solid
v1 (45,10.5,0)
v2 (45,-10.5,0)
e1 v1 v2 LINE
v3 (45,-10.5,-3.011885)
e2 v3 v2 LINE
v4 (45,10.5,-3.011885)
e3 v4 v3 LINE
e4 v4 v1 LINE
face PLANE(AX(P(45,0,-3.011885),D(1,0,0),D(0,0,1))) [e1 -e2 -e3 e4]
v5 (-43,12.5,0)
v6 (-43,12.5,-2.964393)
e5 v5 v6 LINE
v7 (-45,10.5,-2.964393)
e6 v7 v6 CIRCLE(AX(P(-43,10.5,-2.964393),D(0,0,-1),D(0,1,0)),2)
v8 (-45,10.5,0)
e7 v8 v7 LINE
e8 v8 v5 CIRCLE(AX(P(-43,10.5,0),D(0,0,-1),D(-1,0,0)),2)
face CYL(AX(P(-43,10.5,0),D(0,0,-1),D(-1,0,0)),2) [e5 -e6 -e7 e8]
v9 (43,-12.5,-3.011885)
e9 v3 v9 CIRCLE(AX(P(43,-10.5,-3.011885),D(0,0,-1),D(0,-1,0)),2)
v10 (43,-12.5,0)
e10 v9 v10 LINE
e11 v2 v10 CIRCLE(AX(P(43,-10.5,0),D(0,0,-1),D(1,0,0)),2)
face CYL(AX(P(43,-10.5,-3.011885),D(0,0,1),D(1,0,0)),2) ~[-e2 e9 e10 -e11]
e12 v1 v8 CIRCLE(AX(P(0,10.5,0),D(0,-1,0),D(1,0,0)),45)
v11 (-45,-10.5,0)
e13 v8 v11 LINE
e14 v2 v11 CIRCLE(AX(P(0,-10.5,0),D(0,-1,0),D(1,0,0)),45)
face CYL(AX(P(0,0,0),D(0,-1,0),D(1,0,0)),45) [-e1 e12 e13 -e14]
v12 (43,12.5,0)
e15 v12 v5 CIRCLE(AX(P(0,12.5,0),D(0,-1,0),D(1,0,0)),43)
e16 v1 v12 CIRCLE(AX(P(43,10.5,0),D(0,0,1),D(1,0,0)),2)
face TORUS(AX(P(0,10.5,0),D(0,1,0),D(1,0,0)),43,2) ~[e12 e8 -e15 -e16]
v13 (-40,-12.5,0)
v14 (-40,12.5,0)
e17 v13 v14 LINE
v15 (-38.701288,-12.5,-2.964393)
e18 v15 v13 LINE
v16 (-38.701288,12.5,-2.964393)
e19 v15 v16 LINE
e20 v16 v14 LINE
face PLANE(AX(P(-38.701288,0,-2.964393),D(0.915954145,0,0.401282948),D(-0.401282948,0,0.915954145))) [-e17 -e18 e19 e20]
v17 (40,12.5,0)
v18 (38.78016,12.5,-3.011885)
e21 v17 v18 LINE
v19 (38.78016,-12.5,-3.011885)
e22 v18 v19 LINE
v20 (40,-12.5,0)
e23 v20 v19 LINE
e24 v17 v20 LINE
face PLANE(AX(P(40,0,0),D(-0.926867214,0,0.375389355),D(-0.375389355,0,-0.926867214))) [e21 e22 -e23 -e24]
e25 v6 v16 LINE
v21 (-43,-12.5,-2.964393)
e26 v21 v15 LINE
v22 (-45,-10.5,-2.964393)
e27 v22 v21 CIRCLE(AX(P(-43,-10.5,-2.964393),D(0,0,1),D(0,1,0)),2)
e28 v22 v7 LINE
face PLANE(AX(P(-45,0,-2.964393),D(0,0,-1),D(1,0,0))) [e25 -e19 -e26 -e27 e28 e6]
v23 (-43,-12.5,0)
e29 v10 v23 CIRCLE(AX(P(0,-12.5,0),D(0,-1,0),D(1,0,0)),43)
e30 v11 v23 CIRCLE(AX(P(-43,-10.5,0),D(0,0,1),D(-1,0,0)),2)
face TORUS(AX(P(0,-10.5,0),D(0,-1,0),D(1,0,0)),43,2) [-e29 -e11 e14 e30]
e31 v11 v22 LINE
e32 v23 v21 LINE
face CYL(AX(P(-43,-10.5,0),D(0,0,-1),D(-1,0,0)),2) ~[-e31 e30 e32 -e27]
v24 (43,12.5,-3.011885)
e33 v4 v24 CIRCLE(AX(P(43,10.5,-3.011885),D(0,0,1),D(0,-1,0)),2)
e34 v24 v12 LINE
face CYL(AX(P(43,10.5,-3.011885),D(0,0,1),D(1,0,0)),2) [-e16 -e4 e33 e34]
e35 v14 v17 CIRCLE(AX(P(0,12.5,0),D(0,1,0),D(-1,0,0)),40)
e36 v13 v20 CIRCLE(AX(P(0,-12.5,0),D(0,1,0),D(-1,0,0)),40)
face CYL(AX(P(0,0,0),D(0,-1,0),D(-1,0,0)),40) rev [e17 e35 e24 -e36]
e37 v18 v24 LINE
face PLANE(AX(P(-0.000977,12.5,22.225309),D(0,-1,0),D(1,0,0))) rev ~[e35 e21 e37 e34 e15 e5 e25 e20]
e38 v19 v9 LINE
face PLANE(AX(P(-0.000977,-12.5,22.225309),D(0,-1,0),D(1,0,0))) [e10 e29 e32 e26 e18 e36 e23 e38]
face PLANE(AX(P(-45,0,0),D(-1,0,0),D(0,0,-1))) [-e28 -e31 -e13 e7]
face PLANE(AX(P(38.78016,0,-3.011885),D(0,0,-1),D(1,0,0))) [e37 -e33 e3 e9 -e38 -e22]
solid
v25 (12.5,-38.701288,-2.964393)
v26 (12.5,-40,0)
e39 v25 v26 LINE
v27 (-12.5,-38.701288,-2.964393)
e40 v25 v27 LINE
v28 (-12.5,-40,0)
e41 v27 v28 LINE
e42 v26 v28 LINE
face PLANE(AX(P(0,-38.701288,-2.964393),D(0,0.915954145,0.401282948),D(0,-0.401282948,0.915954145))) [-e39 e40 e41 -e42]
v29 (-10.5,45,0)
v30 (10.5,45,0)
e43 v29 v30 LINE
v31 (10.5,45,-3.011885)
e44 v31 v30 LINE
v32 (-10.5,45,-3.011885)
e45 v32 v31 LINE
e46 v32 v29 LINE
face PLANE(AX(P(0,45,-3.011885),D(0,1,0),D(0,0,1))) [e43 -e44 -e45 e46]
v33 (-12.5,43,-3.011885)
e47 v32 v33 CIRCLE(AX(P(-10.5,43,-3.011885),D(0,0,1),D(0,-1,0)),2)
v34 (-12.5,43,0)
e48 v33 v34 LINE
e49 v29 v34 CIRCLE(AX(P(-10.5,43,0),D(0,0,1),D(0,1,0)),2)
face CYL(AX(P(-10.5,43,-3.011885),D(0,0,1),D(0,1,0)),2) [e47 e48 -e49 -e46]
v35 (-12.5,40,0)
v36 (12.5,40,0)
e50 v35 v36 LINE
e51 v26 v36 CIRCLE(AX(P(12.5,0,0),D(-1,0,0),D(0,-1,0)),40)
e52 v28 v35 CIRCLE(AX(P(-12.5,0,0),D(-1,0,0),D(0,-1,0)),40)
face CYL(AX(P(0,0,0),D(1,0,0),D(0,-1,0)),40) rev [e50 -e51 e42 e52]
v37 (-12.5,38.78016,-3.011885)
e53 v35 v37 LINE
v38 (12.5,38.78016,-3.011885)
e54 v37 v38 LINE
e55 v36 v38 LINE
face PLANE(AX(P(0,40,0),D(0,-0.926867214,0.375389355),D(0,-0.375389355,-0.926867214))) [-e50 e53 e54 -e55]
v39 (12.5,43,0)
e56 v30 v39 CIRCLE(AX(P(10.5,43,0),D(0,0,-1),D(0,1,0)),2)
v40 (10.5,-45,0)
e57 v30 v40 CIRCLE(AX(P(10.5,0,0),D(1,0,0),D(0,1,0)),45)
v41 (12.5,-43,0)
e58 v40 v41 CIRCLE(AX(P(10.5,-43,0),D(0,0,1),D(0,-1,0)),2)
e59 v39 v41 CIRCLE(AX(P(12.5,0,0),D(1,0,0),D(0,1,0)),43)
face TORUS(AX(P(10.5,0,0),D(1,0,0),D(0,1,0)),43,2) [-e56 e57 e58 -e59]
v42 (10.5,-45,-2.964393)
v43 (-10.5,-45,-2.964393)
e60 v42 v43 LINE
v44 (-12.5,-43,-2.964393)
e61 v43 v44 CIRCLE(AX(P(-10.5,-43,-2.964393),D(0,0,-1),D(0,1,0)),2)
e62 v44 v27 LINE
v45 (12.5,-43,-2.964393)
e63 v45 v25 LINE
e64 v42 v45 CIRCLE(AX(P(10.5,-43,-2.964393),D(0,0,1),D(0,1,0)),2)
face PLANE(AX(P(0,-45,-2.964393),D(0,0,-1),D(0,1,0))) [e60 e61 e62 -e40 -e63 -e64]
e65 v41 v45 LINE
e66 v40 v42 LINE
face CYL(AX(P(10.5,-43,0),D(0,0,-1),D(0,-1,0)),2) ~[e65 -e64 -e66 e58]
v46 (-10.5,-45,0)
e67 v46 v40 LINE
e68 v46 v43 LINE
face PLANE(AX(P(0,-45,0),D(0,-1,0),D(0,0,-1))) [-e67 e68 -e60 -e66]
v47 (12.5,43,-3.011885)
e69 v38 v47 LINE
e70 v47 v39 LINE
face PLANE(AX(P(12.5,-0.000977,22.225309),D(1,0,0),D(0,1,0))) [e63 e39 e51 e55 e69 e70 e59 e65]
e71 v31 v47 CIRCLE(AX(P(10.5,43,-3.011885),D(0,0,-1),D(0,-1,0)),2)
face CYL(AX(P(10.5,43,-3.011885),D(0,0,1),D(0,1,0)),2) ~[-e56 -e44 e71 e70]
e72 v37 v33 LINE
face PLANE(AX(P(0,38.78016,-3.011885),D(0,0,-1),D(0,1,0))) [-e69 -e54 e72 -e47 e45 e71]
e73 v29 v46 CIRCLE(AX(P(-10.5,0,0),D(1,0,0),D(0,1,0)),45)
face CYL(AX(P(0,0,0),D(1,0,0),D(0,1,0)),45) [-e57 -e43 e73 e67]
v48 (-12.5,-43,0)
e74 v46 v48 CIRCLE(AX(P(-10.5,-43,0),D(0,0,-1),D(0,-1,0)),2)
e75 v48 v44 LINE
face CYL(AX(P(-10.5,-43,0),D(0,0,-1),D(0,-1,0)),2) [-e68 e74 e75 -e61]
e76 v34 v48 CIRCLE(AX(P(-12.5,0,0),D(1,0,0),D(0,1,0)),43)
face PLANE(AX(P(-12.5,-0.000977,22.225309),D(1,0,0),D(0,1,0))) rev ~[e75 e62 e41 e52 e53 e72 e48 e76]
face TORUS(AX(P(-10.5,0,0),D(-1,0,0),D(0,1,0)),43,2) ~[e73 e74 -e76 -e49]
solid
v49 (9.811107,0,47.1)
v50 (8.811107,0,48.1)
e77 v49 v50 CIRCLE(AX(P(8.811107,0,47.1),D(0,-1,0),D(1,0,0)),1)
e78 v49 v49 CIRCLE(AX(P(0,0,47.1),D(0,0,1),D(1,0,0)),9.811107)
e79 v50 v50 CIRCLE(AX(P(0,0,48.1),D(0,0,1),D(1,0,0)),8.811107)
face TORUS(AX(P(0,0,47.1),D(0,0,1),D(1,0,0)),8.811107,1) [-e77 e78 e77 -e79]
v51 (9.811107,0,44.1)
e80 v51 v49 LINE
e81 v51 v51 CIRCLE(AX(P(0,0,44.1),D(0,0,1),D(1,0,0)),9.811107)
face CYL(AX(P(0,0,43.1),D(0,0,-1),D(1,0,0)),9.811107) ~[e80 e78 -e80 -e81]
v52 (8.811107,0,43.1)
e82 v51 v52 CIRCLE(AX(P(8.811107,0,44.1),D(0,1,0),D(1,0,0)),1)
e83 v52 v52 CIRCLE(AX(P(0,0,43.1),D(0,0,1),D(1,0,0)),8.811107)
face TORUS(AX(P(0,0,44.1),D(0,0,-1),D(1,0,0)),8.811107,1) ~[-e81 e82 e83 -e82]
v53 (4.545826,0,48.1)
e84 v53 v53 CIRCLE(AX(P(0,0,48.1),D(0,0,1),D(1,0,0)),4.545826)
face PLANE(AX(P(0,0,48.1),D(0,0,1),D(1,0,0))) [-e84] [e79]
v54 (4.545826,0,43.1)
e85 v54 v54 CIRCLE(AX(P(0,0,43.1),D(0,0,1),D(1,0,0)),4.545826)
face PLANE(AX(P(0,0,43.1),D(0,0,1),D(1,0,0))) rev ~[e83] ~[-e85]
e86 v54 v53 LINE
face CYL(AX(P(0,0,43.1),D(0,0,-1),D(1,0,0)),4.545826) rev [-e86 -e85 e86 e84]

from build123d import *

# Parameters (mm, degrees)
F1_DEPTH = 12.5
F4_ANGLE = 90
F5_R     = 2
F5_2_R   = 2
F6_R     = 9.811106596
F6_R_2   = 4.5458259895
F7_DEPTH = 5
F8_R     = 1


with BuildPart() as f1:
    # F0 (on Front) → F1 (new body, symmetric)
    with BuildSketch(Plane.XZ):
        with BuildLine():
            ThreePointArc((-40, 0), (0, 40), (40, 0))
            Line((40, 0), (38.7801602483, -3.0118847469))
            Line((38.7801602483, -3.0118847469), (45, -3.0118847469))
            Line((45, -3.0118847469), (45, 0))
            ThreePointArc((45, 0), (0, 45), (-45, 0))
            Line((-45, 0), (-45, -2.9643927701))
            Line((-45, -2.9643927701), (-38.7012884021, -2.9643927701))
            Line((-38.7012884021, -2.9643927701), (-40, 0))
        make_face()
    extrude(amount=F1_DEPTH, both=True)


with BuildPart() as f4_1:
    # F4: copy of F1
    add(f1.part.rotate(Axis((0, 0, 43.1), (0, 0, 1)), F4_ANGLE))

    # F5#2
    f5_2_edges = [f4_1.edges().sort_by_distance(p)[0] for p in [
        (0, 45, 0),
        (-12.5, 0, 45),
        (0, -45, 0),
        (12.5, 0, 45),
        (-12.5, -45, -1.482196),
        (12.5, -45, -1.482196),
        (-12.5, 45, -1.505942),
        (12.5, 45, -1.505942),
    ]]
    fillet(f5_2_edges, radius=F5_2_R)


with BuildPart() as f1_1:
    add(f1.part)

    # F5
    f5_edges = [f1_1.edges().sort_by_distance(p)[0] for p in [
        (0, -12.5, 45),
        (0, 12.5, 45),
        (-45, 12.5, -1.482196),
        (-45, -12.5, -1.482196),
        (45, 12.5, -1.505942),
        (45, -12.5, -1.505942),
    ]]
    fillet(f5_edges, radius=F5_R)


with BuildPart() as f7:
    # F6 (on offset) → F7 (new body)
    with BuildSketch(Plane.XY.offset(43.1)):
        Circle(F6_R)
        Circle(F6_R_2, mode=Mode.SUBTRACT)
    extrude(amount=F7_DEPTH)

    # F8
    f8_edges = [f7.edges().sort_by_distance(p)[0] for p in [
        (9.811107, 0, 45.6),
        (-9.811107, 0, 43.1),
        (-9.811107, 0, 48.1),
    ]]
    fillet(f8_edges, radius=F8_R)


solid = Compound([f4_1.part, f1_1.part, f7.part])
